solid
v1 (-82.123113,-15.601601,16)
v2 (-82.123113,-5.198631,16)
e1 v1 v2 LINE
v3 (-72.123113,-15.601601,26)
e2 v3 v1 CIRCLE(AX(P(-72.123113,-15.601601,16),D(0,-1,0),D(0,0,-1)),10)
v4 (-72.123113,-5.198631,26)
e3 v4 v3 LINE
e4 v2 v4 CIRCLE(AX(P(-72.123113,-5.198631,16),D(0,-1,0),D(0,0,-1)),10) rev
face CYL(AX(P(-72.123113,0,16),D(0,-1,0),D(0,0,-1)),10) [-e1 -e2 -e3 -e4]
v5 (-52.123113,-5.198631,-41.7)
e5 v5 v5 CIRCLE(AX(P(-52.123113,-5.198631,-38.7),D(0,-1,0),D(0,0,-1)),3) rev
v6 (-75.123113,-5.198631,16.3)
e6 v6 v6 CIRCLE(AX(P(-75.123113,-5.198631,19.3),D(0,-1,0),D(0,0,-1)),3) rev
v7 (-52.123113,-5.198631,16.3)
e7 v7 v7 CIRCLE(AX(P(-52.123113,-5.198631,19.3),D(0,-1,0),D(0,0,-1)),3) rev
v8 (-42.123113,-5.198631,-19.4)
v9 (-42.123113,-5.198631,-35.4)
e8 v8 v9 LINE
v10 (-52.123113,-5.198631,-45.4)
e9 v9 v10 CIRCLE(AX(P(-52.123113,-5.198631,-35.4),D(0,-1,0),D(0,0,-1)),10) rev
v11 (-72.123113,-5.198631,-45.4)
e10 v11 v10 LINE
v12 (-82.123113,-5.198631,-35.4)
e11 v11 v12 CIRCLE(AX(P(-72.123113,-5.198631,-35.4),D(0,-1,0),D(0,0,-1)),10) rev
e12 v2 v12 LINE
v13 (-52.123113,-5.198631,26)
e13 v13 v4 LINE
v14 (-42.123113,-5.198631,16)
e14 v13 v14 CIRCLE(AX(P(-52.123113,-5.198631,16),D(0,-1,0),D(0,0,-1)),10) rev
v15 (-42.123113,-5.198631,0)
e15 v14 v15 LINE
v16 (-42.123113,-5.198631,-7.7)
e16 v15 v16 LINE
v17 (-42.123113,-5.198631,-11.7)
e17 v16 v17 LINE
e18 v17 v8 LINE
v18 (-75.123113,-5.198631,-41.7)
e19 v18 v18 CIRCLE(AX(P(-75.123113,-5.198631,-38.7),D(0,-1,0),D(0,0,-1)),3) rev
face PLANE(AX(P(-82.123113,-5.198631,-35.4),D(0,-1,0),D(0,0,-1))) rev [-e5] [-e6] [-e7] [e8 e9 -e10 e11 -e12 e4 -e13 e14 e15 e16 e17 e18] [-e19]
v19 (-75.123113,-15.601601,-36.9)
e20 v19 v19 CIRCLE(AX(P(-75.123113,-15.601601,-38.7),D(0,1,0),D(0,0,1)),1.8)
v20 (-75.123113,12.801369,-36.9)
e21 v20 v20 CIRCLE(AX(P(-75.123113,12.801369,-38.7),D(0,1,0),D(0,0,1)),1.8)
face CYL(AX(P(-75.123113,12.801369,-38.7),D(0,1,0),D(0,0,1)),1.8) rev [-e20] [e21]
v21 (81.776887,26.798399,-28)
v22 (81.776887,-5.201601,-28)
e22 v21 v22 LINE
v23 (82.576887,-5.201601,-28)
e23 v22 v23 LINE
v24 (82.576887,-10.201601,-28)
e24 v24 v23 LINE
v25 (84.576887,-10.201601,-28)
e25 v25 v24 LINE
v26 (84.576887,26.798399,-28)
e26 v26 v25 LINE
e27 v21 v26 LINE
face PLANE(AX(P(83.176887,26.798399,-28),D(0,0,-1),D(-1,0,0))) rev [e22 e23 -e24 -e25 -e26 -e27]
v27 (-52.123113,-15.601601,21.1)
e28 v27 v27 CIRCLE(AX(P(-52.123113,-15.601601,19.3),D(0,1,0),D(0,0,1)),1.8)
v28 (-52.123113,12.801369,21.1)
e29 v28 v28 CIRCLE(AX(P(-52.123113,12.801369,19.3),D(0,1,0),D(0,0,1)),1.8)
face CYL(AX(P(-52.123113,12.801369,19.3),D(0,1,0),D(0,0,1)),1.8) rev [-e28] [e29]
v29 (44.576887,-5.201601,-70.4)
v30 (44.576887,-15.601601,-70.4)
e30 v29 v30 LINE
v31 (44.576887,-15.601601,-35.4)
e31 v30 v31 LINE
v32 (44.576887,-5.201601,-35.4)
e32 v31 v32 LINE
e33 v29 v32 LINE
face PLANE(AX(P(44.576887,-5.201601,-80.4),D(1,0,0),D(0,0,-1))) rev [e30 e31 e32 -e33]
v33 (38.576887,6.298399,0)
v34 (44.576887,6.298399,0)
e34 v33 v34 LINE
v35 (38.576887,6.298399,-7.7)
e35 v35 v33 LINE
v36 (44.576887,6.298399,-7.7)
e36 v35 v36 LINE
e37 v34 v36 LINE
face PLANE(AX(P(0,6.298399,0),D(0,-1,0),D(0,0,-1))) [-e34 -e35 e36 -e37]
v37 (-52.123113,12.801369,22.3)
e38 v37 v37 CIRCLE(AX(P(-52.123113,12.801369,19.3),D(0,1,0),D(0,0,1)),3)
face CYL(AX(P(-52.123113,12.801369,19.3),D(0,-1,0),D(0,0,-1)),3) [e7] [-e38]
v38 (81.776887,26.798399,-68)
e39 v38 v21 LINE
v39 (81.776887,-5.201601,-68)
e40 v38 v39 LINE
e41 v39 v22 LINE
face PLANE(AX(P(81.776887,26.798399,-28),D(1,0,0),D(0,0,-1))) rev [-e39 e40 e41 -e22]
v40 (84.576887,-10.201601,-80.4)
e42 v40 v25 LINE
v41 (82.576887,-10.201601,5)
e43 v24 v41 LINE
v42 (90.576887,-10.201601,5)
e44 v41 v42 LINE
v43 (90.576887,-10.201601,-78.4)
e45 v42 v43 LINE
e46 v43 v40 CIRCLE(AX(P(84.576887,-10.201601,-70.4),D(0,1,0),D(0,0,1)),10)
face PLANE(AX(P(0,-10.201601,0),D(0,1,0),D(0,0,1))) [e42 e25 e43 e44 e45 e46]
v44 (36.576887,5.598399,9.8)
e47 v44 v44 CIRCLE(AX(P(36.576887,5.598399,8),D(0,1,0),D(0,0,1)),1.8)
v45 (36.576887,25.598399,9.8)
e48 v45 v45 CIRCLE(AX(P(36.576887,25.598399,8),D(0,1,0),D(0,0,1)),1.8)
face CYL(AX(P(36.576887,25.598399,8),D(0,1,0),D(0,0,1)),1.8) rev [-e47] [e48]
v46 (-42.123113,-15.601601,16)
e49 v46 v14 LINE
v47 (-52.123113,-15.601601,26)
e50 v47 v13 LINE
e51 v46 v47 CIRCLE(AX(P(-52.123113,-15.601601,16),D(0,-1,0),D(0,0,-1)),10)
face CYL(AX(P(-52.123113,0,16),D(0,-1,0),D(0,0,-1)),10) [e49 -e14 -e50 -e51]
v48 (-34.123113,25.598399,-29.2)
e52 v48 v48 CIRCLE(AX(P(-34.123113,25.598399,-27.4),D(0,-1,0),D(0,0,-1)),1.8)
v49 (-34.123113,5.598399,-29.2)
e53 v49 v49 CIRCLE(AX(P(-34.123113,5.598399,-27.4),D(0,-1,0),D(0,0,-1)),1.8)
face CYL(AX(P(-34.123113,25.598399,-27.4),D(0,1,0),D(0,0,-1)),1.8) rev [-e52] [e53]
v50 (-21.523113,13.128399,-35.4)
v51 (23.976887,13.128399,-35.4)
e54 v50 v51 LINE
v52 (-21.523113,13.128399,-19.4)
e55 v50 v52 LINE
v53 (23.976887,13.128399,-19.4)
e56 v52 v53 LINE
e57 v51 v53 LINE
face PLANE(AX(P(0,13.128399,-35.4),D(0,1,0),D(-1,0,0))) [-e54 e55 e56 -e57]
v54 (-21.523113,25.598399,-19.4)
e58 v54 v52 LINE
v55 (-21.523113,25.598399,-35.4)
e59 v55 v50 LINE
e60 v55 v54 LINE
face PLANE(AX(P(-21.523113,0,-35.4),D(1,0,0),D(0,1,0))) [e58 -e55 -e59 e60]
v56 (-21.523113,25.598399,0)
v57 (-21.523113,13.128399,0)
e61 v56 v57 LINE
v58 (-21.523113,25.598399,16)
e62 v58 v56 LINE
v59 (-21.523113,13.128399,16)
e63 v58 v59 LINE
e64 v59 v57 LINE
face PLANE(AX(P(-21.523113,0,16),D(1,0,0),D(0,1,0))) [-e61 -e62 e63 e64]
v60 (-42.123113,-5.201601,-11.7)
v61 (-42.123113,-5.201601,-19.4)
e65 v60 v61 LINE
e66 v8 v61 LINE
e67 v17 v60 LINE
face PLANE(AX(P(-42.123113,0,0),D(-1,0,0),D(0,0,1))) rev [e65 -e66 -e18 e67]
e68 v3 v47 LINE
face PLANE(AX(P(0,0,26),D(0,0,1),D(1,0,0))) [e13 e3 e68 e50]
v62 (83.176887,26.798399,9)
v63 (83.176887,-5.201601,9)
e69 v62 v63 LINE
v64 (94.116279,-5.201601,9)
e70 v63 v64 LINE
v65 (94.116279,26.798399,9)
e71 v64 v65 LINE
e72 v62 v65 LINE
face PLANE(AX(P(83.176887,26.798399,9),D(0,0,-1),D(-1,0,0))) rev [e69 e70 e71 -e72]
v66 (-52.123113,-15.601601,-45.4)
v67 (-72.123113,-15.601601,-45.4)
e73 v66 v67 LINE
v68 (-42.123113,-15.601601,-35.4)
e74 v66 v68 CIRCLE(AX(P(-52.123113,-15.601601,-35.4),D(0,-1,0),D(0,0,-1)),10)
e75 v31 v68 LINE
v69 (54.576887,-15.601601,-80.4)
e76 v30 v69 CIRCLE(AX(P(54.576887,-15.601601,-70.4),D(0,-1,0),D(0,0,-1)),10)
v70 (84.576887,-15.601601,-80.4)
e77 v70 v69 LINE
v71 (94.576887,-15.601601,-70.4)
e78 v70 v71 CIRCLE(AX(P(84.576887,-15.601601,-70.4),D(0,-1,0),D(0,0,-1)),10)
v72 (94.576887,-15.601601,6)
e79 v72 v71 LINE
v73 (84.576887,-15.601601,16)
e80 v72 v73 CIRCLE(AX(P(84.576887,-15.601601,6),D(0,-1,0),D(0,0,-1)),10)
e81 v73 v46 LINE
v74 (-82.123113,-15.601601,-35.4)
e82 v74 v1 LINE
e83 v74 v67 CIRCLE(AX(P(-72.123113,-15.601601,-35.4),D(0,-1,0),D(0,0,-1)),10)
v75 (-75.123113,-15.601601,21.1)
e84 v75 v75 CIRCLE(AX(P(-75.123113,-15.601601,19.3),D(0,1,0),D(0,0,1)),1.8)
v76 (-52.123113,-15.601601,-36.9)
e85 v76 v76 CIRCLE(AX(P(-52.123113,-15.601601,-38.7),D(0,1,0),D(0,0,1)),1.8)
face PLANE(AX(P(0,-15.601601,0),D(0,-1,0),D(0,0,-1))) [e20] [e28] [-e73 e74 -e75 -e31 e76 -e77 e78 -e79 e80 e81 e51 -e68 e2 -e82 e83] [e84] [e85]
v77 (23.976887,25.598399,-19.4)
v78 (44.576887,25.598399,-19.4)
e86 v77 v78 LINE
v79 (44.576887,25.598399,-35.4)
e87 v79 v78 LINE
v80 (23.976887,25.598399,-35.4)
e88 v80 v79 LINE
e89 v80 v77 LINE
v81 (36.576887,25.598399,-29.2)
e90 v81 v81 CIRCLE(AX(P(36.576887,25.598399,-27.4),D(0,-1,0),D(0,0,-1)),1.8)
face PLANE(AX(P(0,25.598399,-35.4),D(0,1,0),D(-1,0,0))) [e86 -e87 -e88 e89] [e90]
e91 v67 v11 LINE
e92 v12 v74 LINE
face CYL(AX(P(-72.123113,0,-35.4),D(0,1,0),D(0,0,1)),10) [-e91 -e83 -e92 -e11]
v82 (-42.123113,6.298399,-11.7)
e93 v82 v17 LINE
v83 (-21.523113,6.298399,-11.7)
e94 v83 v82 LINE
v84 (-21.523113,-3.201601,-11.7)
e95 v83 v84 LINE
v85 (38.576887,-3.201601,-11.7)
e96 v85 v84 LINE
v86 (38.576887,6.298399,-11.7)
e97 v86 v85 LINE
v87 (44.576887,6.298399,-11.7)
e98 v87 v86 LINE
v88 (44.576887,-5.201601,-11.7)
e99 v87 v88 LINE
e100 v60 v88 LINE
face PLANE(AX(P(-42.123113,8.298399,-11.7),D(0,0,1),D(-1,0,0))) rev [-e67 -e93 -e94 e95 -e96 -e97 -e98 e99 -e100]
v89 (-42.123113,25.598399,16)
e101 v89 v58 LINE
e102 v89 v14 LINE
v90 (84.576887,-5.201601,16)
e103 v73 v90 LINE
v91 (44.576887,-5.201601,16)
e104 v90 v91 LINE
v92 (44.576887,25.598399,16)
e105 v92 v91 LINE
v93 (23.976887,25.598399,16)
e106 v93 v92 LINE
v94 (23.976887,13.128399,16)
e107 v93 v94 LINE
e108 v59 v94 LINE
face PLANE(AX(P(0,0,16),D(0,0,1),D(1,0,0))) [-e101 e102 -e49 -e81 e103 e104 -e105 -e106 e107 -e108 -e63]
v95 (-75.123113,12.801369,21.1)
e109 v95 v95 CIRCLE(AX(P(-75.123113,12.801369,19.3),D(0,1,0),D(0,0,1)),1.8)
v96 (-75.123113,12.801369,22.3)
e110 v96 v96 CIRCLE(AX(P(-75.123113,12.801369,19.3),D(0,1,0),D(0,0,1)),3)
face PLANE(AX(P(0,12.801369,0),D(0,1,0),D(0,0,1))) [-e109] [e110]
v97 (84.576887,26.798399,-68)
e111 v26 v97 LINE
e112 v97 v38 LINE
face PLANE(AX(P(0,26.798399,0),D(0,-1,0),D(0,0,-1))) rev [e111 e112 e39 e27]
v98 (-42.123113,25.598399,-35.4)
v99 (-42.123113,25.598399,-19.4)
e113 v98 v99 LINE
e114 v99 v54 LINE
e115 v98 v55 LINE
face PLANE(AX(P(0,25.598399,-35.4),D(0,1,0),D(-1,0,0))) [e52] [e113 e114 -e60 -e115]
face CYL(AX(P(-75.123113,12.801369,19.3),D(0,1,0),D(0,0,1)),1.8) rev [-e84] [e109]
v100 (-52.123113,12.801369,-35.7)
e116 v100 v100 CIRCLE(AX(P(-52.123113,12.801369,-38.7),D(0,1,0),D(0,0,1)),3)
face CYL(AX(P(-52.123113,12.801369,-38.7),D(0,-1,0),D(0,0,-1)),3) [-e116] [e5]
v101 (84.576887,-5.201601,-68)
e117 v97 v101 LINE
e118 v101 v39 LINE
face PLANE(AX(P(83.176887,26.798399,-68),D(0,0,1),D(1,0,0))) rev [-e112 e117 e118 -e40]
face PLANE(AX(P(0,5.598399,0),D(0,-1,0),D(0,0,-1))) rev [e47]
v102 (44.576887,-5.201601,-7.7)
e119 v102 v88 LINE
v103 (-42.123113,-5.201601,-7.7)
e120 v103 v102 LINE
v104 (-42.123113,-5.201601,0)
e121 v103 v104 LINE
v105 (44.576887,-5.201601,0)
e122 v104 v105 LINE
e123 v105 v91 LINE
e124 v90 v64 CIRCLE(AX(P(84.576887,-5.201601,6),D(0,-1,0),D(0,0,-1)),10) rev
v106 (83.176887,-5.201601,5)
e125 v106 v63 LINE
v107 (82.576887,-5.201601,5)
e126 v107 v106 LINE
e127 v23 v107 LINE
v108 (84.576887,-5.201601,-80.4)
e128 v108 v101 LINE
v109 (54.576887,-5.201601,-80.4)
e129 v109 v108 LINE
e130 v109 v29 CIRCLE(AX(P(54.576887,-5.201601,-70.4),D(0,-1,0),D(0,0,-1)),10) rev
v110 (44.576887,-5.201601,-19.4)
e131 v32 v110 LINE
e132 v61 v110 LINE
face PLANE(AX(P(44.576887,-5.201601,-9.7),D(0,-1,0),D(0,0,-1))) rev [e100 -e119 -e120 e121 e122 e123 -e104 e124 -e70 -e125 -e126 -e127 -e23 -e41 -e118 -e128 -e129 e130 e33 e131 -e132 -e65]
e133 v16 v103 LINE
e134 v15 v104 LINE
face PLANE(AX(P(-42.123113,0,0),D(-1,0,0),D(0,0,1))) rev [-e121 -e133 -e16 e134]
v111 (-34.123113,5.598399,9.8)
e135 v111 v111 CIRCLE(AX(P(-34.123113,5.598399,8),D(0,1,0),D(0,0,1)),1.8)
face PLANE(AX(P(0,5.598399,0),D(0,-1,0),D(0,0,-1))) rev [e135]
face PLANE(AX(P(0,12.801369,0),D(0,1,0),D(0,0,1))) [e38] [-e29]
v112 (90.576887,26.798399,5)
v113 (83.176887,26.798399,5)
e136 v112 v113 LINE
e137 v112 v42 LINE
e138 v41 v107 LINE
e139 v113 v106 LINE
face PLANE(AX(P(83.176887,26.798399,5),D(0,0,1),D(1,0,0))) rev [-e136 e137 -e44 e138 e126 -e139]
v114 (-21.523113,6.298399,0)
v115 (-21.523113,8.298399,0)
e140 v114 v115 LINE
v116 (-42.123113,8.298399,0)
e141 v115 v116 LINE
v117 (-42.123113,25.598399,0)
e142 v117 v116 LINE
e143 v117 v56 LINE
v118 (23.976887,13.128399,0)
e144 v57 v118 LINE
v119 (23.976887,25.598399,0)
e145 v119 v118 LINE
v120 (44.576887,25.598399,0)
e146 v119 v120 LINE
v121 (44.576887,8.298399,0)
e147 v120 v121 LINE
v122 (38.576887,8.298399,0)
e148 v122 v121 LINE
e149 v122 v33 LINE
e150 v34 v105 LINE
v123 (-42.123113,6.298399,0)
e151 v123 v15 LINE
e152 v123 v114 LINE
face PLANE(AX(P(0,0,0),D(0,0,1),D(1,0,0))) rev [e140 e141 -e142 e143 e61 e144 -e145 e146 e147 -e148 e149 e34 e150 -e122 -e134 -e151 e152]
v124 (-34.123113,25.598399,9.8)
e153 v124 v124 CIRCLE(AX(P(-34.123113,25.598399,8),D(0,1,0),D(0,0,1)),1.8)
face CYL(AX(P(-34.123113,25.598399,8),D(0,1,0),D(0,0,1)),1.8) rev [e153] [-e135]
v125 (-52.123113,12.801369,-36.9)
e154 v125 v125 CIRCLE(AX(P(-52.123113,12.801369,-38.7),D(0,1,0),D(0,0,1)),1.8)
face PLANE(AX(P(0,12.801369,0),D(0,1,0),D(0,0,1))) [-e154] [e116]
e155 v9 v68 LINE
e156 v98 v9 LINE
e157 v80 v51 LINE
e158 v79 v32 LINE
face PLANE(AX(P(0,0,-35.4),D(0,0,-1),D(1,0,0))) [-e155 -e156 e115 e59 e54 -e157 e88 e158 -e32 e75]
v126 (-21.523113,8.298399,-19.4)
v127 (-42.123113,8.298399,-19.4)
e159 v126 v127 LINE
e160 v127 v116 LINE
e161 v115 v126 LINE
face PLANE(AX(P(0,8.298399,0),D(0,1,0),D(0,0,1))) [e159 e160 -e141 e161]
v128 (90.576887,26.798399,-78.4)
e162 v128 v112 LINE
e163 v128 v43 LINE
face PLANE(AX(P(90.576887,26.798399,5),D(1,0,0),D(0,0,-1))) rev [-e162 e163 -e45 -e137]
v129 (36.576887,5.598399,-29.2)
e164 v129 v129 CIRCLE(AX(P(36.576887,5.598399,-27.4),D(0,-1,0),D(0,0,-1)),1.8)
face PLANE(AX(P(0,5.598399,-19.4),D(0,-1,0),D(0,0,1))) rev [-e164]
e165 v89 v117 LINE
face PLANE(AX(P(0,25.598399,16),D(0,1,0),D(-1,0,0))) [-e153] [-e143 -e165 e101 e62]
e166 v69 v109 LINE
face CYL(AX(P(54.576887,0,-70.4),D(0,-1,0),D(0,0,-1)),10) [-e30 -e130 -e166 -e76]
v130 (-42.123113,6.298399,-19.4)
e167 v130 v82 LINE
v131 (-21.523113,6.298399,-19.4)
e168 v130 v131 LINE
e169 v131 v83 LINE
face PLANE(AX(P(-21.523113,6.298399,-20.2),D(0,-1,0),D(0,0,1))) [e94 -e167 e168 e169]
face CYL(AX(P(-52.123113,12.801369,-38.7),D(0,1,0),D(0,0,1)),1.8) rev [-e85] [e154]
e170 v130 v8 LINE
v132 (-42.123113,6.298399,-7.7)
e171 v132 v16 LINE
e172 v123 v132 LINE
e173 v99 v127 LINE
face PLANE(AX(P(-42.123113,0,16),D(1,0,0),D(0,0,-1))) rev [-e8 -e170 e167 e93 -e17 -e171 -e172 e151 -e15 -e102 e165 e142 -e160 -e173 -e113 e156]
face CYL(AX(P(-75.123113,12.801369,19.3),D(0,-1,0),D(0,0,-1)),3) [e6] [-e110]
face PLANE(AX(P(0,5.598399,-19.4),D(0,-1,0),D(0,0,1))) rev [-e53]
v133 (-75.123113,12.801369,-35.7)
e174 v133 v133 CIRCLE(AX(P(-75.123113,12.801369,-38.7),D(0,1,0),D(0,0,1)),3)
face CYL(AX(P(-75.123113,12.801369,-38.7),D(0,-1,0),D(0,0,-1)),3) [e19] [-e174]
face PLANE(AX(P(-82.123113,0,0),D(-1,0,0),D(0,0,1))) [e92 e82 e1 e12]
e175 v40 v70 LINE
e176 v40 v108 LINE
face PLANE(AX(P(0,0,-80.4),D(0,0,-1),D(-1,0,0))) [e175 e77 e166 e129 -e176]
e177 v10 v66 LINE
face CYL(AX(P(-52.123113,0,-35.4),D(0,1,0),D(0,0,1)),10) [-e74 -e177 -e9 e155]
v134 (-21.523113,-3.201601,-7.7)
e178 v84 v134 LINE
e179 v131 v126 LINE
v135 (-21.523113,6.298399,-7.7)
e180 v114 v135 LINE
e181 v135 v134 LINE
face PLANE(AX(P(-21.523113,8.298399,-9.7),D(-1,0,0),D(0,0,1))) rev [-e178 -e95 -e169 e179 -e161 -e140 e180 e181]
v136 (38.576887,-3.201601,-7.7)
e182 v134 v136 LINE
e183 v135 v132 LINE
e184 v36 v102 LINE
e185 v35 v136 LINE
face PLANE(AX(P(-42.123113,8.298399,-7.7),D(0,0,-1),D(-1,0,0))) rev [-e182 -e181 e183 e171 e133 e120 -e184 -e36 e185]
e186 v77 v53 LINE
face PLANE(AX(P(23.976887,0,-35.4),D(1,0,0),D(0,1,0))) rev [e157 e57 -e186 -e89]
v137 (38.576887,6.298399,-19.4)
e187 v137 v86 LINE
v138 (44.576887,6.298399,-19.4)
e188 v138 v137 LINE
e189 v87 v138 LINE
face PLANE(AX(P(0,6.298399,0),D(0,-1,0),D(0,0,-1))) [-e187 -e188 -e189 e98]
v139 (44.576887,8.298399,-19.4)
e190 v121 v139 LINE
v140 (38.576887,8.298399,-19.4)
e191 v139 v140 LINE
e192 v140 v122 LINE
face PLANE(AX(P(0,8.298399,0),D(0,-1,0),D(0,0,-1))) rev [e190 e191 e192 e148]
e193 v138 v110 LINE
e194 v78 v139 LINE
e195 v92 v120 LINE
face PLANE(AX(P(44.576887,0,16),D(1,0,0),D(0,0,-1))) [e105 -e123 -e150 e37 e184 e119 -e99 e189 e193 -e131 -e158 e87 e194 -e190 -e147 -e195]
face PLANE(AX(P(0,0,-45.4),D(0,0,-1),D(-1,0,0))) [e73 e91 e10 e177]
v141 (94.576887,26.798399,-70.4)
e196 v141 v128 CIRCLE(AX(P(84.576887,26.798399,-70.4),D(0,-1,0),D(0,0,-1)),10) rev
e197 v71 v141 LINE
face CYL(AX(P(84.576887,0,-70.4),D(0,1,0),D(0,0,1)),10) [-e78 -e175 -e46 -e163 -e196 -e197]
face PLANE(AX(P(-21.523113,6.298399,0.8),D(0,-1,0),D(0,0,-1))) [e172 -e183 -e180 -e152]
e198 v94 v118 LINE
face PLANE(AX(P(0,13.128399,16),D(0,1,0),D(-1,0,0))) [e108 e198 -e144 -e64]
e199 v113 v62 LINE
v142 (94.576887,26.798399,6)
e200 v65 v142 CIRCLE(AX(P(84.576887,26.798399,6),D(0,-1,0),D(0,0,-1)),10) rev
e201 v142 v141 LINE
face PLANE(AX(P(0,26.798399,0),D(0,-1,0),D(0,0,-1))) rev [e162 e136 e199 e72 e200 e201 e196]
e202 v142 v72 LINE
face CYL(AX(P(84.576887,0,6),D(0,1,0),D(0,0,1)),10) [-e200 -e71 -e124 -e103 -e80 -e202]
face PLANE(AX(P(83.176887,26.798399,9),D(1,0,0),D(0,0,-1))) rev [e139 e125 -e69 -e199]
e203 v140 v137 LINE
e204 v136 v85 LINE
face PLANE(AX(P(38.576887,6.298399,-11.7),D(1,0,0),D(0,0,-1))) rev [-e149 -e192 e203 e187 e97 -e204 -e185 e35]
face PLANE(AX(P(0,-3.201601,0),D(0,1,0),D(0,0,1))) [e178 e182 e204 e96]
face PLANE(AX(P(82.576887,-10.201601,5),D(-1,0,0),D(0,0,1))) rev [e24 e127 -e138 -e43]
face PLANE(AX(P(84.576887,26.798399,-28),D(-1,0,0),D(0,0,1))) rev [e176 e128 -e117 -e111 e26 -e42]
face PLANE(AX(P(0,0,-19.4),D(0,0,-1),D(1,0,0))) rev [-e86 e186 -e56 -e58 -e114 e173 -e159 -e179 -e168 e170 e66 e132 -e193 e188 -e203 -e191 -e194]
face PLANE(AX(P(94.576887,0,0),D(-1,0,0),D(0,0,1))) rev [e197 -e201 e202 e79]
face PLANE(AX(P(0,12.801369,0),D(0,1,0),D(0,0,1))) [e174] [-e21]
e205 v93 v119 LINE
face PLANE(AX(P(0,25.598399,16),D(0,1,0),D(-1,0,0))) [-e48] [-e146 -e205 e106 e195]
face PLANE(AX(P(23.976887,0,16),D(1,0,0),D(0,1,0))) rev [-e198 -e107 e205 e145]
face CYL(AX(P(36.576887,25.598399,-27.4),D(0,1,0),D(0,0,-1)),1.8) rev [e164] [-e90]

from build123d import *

# Parameters (mm, degrees)
EXTRUDE_1_DEPTH     = 16
F_1_0MM_1_D         = 3.6
F_1_0MM_2_D         = 3.6
SKETCH_8_W          = 86.7
SKETCH_8_H          = 16
EXTRUDE_2_DEPTH     = 21.2
SKETCH_9_W          = 86.7
SKETCH_9_H          = 10.4
EXTRUDE_3_DEPTH     = 9.7
SKETCH_15_W         = 20.6
SKETCH_15_H         = 2
EXTRUDE_8_DEPTH     = 13.5
SKETCH_16_W         = 20.6
SKETCH_16_H         = 2
EXTRUDE_9_DEPTH     = 10.5
SKETCH_19_W         = 51.4
SKETCH_19_H         = 10.4
EXTRUDE_10_DEPTH    = 50
SKETCH_25_W         = 50
SKETCH_25_H         = 10.4
EXTRUDE_11_DEPTH    = 45
EXTRUDE_12_DEPTH    = 32
CUT_EXTRUDE_1_DEPTH = 5
SKETCH_29_W         = 51.4
SKETCH_29_H         = 10.402970243
EXTRUDE_13_DEPTH    = 40
SKETCH_32_W         = 40
SKETCH_32_H         = 10.402970243
EXTRUDE_14_DEPTH    = 10
SKETCH_33_W         = 40
SKETCH_33_H         = 10.402970243
EXTRUDE_15_DEPTH    = 10
SKETCH_34_R         = 3
EXTRUDE_16_DEPTH    = 18
F_1_0MM_3_D         = 3.6
F_1_0MM_4_D         = 3.6
FILLET_1_R          = 10
FILLET_2_R          = 10
SKETCH_40_W         = 6
SKETCH_40_H         = 4
EXTRUDE_17_DEPTH    = 11.5
SKETCH_42_W         = 6
SKETCH_42_H         = 19.4
EXTRUDE_18_DEPTH    = 2
SKETCH_46_W         = 60.1
SKETCH_46_H         = 4
EXTRUDE_19_DEPTH    = 2


with BuildPart() as part:
    # 草图1 → 凸台-拉伸1 (new body)
    with BuildSketch(Plane.XY):
        Polygon((-21.523113208, 25.59839861), (-42.123113208, 25.59839861), (-42.123113208, 5.59839861), (44.576886792, 5.59839861), (44.576886792, 25.59839861), (23.976886792, 25.59839861), (23.976886792, 13.12839861), (-21.523113208, 13.12839861), align=None)
    extrude_1 = extrude(amount=EXTRUDE_1_DEPTH)

    # Ø1.0mm 暗销孔1 (through all)
    with Locations(Plane(origin=(0, 25.59839861, 0), x_dir=(1, 0, 0), z_dir=(0, 1, 0))):
        with Locations((36.576886792, -8)):
            f_1_0mm_1 = Hole(F_1_0MM_1_D / 2)

    # Ø1.0mm 暗销孔2 (through all)
    with Locations(Plane(origin=(0, 25.59839861, 0), x_dir=(1, 0, 0), z_dir=(0, 1, 0))):
        with Locations((-34.123113208, -8)):
            f_1_0mm_2 = Hole(F_1_0MM_2_D / 2)

    # 草图8 → 凸台-拉伸2 (add)
    with BuildSketch(Plane.XZ.offset(-5.59839861)):
        with Locations((1.226886792, 8)):
            Rectangle(SKETCH_8_W, SKETCH_8_H)
    extrude_2 = extrude(amount=EXTRUDE_2_DEPTH)

    # 草图9 → 凸台-拉伸3 (add)
    with BuildSketch(Plane(origin=(0, 0, 0), x_dir=(-1, 0, 0), z_dir=(0, 0, -1))):
        with Locations((-1.226886792, -10.40160139)):
            Rectangle(SKETCH_9_W, SKETCH_9_H)
    extrude_3 = extrude(amount=EXTRUDE_3_DEPTH)

    # 草图15 → 凸台-拉伸8 (add)
    with BuildSketch(Plane(origin=(0, -5.20160139, 0), x_dir=(1, 0, 0), z_dir=(0, 1, 0))):
        with Locations((-31.823113208, 8.7)):
            Rectangle(SKETCH_15_W, SKETCH_15_H)
    extrude_8 = extrude(amount=EXTRUDE_8_DEPTH)

    # 草图16 → 凸台-拉伸9 (add)
    with BuildSketch(Plane(origin=(0, 0, -9.7), x_dir=(-1, 0, 0), z_dir=(0, 0, -1))):
        with Locations((31.823113208, 7.29839861)):
            Rectangle(SKETCH_16_W, SKETCH_16_H)
    extrude_9 = extrude(amount=-EXTRUDE_9_DEPTH)

    # 镜向20: 凸台-拉伸1, Ø1.0mm 暗销孔1, Ø1.0mm 暗销孔2, 凸台-拉伸2, 凸台-拉伸3, 凸台-拉伸8, 凸台-拉伸9 across plane
    add(extrude_1.mirror(Plane.XY.offset(-9.7)))
    add(f_1_0mm_1.mirror(Plane.XY.offset(-9.7)), mode=Mode.SUBTRACT)
    add(f_1_0mm_2.mirror(Plane.XY.offset(-9.7)), mode=Mode.SUBTRACT)
    add(extrude_2.mirror(Plane.XY.offset(-9.7)))
    add(extrude_3.mirror(Plane.XY.offset(-9.7)))
    add(extrude_8.mirror(Plane.XY.offset(-9.7)))
    add(extrude_9.mirror(Plane.XY.offset(-9.7)))

    # 草图19 → 凸台-拉伸10 (add)
    with BuildSketch(Plane(origin=(44.576886792, 0, 0), x_dir=(0, 0, -1), z_dir=(1, 0, 0))):
        with Locations((9.7, -10.40160139)):
            Rectangle(SKETCH_19_W, SKETCH_19_H)
    extrude(amount=EXTRUDE_10_DEPTH)

    # 草图25 → 凸台-拉伸11 (add)
    with BuildSketch(Plane(origin=(0, 0, -35.4), x_dir=(-1, 0, 0), z_dir=(0, 0, -1))):
        with Locations((-69.576886792, -10.40160139)):
            Rectangle(SKETCH_25_W, SKETCH_25_H)
    extrude(amount=EXTRUDE_11_DEPTH)

    # 草图26 → 凸台-拉伸12 (add)
    with BuildSketch(Plane(origin=(0, -5.20160139, 0), x_dir=(1, 0, 0), z_dir=(0, 1, 0))):
        Polygon((83.176886792, -9), (94.576886792, -9), (94.576886792, -5), (94.576886792, 80.4), (90.576886792, 80.4), (90.576886792, -5), (83.176886792, -5), align=None)
        Polygon((83.176886792, 28), (84.576886792, 28), (84.576886792, 68), (83.176886792, 68), (81.776886792, 68), (81.776886792, 28), align=None)
    extrude(amount=EXTRUDE_12_DEPTH)

    # 草图28 → 切除-拉伸1 (cut)
    with BuildSketch(Plane(origin=(0, -5.20160139, 0), x_dir=(1, 0, 0), z_dir=(0, 1, 0))):
        Polygon((90.576886792, -5), (84.576886792, -5), (82.576886792, -5), (82.576886792, 28), (84.576886792, 28), (84.576886792, 80.4), (90.576886792, 80.4), align=None)
    extrude(amount=-CUT_EXTRUDE_1_DEPTH, mode=Mode.SUBTRACT)

    # 草图29 → 凸台-拉伸13 (add)
    with BuildSketch(Plane.ZY.offset(42.123113208)):
        with Locations((-9.7, -10.400116268)):
            Rectangle(SKETCH_29_W, SKETCH_29_H)
    extrude(amount=EXTRUDE_13_DEPTH)

    # 草图32 → 凸台-拉伸14 (add)
    with BuildSketch(Plane(origin=(0, 0, -35.4), x_dir=(-1, 0, 0), z_dir=(0, 0, -1))):
        with Locations((62.123113208, -10.400116268)):
            Rectangle(SKETCH_32_W, SKETCH_32_H)
    extrude(amount=EXTRUDE_14_DEPTH)

    # 草图33 → 凸台-拉伸15 (add)
    with BuildSketch(Plane.XY.offset(16)):
        with Locations((-62.123113208, -10.400116268)):
            Rectangle(SKETCH_33_W, SKETCH_33_H)
    extrude(amount=EXTRUDE_15_DEPTH)

    # 草图34 → 凸台-拉伸16 (add)
    with BuildSketch(Plane(origin=(0, -5.198631147, 0), x_dir=(1, 0, 0), z_dir=(0, 1, 0))):
        with Locations(Location((-52.123113208, 38.7, 0), (0, 0, 90))):
            Circle(SKETCH_34_R)
        with Locations(Location((-75.123113208, 38.7, 0), (0, 0, 90))):
            Circle(SKETCH_34_R)
        with Locations(Location((-52.123113208, -19.3, 0), (0, 0, 90))):
            Circle(SKETCH_34_R)
        with Locations(Location((-75.123113208, -19.3, 0), (0, 0, 90))):
            Circle(SKETCH_34_R)
    extrude(amount=EXTRUDE_16_DEPTH)

    # Ø1.0mm 暗销孔3 (through all)
    with Locations(Plane(origin=(0, 12.801368853, 0), x_dir=(1, 0, 0), z_dir=(0, 1, 0))):
        with Locations((-52.123113208, 38.7)):
            Hole(F_1_0MM_3_D / 2)

    # Ø1.0mm 暗销孔4 (through all)
    with Locations(Plane(origin=(0, 12.801368853, 0), x_dir=(1, 0, 0), z_dir=(0, 1, 0))):
        with Locations((-52.123113208, -19.3), (-75.123113208, 38.7), (-75.123113208, -19.3)):
            Hole(F_1_0MM_4_D / 2)

    # 圆角1
    fillet_1_edges = [part.edges().sort_by_distance(p)[0] for p in [
        (44.576886792, -10.40160139, -80.4),
        (94.576886792, -10.40160139, 16),
        (-42.123113208, -10.400116268, -45.4),
        (-42.123113208, -10.400116268, 26),
        (-82.123113208, -10.400116268, -45.4),
        (-82.123113208, -10.400116268, 26),
    ]]
    fillet(fillet_1_edges, radius=FILLET_1_R - 0.0001)  # a hair under: the kernel refuses the full size

    # 圆角2
    fillet_2_edges = [part.edges().sort_by_distance(p)[0] for p in [
        (94.576886792, 5.59839861, -80.4),
    ]]
    fillet(fillet_2_edges, radius=FILLET_2_R - 0.0001)  # a hair under: the kernel refuses the full size

    # 草图40 → 凸台-拉伸17 (add)
    with BuildSketch(Plane(origin=(0, -5.20160139, 0), x_dir=(1, 0, 0), z_dir=(0, 1, 0))):
        with Locations((41.576886792, 9.7)):
            Rectangle(SKETCH_40_W, SKETCH_40_H)
    extrude(amount=EXTRUDE_17_DEPTH)

    # 草图42 → 凸台-拉伸18 (add)
    with BuildSketch(Plane(origin=(0, 6.29839861, 0), x_dir=(1, 0, 0), z_dir=(0, 1, 0))):
        with Locations((41.576886792, 9.7)):
            Rectangle(SKETCH_42_W, SKETCH_42_H)
    extrude(amount=EXTRUDE_18_DEPTH)

    # 草图46 → 凸台-拉伸19 (add)
    with BuildSketch(Plane(origin=(0, -5.20160139, 0), x_dir=(1, 0, 0), z_dir=(0, 1, 0))):
        with Locations((8.526886792, 9.7)):
            Rectangle(SKETCH_46_W, SKETCH_46_H)
    extrude(amount=EXTRUDE_19_DEPTH)


solid = part.part
